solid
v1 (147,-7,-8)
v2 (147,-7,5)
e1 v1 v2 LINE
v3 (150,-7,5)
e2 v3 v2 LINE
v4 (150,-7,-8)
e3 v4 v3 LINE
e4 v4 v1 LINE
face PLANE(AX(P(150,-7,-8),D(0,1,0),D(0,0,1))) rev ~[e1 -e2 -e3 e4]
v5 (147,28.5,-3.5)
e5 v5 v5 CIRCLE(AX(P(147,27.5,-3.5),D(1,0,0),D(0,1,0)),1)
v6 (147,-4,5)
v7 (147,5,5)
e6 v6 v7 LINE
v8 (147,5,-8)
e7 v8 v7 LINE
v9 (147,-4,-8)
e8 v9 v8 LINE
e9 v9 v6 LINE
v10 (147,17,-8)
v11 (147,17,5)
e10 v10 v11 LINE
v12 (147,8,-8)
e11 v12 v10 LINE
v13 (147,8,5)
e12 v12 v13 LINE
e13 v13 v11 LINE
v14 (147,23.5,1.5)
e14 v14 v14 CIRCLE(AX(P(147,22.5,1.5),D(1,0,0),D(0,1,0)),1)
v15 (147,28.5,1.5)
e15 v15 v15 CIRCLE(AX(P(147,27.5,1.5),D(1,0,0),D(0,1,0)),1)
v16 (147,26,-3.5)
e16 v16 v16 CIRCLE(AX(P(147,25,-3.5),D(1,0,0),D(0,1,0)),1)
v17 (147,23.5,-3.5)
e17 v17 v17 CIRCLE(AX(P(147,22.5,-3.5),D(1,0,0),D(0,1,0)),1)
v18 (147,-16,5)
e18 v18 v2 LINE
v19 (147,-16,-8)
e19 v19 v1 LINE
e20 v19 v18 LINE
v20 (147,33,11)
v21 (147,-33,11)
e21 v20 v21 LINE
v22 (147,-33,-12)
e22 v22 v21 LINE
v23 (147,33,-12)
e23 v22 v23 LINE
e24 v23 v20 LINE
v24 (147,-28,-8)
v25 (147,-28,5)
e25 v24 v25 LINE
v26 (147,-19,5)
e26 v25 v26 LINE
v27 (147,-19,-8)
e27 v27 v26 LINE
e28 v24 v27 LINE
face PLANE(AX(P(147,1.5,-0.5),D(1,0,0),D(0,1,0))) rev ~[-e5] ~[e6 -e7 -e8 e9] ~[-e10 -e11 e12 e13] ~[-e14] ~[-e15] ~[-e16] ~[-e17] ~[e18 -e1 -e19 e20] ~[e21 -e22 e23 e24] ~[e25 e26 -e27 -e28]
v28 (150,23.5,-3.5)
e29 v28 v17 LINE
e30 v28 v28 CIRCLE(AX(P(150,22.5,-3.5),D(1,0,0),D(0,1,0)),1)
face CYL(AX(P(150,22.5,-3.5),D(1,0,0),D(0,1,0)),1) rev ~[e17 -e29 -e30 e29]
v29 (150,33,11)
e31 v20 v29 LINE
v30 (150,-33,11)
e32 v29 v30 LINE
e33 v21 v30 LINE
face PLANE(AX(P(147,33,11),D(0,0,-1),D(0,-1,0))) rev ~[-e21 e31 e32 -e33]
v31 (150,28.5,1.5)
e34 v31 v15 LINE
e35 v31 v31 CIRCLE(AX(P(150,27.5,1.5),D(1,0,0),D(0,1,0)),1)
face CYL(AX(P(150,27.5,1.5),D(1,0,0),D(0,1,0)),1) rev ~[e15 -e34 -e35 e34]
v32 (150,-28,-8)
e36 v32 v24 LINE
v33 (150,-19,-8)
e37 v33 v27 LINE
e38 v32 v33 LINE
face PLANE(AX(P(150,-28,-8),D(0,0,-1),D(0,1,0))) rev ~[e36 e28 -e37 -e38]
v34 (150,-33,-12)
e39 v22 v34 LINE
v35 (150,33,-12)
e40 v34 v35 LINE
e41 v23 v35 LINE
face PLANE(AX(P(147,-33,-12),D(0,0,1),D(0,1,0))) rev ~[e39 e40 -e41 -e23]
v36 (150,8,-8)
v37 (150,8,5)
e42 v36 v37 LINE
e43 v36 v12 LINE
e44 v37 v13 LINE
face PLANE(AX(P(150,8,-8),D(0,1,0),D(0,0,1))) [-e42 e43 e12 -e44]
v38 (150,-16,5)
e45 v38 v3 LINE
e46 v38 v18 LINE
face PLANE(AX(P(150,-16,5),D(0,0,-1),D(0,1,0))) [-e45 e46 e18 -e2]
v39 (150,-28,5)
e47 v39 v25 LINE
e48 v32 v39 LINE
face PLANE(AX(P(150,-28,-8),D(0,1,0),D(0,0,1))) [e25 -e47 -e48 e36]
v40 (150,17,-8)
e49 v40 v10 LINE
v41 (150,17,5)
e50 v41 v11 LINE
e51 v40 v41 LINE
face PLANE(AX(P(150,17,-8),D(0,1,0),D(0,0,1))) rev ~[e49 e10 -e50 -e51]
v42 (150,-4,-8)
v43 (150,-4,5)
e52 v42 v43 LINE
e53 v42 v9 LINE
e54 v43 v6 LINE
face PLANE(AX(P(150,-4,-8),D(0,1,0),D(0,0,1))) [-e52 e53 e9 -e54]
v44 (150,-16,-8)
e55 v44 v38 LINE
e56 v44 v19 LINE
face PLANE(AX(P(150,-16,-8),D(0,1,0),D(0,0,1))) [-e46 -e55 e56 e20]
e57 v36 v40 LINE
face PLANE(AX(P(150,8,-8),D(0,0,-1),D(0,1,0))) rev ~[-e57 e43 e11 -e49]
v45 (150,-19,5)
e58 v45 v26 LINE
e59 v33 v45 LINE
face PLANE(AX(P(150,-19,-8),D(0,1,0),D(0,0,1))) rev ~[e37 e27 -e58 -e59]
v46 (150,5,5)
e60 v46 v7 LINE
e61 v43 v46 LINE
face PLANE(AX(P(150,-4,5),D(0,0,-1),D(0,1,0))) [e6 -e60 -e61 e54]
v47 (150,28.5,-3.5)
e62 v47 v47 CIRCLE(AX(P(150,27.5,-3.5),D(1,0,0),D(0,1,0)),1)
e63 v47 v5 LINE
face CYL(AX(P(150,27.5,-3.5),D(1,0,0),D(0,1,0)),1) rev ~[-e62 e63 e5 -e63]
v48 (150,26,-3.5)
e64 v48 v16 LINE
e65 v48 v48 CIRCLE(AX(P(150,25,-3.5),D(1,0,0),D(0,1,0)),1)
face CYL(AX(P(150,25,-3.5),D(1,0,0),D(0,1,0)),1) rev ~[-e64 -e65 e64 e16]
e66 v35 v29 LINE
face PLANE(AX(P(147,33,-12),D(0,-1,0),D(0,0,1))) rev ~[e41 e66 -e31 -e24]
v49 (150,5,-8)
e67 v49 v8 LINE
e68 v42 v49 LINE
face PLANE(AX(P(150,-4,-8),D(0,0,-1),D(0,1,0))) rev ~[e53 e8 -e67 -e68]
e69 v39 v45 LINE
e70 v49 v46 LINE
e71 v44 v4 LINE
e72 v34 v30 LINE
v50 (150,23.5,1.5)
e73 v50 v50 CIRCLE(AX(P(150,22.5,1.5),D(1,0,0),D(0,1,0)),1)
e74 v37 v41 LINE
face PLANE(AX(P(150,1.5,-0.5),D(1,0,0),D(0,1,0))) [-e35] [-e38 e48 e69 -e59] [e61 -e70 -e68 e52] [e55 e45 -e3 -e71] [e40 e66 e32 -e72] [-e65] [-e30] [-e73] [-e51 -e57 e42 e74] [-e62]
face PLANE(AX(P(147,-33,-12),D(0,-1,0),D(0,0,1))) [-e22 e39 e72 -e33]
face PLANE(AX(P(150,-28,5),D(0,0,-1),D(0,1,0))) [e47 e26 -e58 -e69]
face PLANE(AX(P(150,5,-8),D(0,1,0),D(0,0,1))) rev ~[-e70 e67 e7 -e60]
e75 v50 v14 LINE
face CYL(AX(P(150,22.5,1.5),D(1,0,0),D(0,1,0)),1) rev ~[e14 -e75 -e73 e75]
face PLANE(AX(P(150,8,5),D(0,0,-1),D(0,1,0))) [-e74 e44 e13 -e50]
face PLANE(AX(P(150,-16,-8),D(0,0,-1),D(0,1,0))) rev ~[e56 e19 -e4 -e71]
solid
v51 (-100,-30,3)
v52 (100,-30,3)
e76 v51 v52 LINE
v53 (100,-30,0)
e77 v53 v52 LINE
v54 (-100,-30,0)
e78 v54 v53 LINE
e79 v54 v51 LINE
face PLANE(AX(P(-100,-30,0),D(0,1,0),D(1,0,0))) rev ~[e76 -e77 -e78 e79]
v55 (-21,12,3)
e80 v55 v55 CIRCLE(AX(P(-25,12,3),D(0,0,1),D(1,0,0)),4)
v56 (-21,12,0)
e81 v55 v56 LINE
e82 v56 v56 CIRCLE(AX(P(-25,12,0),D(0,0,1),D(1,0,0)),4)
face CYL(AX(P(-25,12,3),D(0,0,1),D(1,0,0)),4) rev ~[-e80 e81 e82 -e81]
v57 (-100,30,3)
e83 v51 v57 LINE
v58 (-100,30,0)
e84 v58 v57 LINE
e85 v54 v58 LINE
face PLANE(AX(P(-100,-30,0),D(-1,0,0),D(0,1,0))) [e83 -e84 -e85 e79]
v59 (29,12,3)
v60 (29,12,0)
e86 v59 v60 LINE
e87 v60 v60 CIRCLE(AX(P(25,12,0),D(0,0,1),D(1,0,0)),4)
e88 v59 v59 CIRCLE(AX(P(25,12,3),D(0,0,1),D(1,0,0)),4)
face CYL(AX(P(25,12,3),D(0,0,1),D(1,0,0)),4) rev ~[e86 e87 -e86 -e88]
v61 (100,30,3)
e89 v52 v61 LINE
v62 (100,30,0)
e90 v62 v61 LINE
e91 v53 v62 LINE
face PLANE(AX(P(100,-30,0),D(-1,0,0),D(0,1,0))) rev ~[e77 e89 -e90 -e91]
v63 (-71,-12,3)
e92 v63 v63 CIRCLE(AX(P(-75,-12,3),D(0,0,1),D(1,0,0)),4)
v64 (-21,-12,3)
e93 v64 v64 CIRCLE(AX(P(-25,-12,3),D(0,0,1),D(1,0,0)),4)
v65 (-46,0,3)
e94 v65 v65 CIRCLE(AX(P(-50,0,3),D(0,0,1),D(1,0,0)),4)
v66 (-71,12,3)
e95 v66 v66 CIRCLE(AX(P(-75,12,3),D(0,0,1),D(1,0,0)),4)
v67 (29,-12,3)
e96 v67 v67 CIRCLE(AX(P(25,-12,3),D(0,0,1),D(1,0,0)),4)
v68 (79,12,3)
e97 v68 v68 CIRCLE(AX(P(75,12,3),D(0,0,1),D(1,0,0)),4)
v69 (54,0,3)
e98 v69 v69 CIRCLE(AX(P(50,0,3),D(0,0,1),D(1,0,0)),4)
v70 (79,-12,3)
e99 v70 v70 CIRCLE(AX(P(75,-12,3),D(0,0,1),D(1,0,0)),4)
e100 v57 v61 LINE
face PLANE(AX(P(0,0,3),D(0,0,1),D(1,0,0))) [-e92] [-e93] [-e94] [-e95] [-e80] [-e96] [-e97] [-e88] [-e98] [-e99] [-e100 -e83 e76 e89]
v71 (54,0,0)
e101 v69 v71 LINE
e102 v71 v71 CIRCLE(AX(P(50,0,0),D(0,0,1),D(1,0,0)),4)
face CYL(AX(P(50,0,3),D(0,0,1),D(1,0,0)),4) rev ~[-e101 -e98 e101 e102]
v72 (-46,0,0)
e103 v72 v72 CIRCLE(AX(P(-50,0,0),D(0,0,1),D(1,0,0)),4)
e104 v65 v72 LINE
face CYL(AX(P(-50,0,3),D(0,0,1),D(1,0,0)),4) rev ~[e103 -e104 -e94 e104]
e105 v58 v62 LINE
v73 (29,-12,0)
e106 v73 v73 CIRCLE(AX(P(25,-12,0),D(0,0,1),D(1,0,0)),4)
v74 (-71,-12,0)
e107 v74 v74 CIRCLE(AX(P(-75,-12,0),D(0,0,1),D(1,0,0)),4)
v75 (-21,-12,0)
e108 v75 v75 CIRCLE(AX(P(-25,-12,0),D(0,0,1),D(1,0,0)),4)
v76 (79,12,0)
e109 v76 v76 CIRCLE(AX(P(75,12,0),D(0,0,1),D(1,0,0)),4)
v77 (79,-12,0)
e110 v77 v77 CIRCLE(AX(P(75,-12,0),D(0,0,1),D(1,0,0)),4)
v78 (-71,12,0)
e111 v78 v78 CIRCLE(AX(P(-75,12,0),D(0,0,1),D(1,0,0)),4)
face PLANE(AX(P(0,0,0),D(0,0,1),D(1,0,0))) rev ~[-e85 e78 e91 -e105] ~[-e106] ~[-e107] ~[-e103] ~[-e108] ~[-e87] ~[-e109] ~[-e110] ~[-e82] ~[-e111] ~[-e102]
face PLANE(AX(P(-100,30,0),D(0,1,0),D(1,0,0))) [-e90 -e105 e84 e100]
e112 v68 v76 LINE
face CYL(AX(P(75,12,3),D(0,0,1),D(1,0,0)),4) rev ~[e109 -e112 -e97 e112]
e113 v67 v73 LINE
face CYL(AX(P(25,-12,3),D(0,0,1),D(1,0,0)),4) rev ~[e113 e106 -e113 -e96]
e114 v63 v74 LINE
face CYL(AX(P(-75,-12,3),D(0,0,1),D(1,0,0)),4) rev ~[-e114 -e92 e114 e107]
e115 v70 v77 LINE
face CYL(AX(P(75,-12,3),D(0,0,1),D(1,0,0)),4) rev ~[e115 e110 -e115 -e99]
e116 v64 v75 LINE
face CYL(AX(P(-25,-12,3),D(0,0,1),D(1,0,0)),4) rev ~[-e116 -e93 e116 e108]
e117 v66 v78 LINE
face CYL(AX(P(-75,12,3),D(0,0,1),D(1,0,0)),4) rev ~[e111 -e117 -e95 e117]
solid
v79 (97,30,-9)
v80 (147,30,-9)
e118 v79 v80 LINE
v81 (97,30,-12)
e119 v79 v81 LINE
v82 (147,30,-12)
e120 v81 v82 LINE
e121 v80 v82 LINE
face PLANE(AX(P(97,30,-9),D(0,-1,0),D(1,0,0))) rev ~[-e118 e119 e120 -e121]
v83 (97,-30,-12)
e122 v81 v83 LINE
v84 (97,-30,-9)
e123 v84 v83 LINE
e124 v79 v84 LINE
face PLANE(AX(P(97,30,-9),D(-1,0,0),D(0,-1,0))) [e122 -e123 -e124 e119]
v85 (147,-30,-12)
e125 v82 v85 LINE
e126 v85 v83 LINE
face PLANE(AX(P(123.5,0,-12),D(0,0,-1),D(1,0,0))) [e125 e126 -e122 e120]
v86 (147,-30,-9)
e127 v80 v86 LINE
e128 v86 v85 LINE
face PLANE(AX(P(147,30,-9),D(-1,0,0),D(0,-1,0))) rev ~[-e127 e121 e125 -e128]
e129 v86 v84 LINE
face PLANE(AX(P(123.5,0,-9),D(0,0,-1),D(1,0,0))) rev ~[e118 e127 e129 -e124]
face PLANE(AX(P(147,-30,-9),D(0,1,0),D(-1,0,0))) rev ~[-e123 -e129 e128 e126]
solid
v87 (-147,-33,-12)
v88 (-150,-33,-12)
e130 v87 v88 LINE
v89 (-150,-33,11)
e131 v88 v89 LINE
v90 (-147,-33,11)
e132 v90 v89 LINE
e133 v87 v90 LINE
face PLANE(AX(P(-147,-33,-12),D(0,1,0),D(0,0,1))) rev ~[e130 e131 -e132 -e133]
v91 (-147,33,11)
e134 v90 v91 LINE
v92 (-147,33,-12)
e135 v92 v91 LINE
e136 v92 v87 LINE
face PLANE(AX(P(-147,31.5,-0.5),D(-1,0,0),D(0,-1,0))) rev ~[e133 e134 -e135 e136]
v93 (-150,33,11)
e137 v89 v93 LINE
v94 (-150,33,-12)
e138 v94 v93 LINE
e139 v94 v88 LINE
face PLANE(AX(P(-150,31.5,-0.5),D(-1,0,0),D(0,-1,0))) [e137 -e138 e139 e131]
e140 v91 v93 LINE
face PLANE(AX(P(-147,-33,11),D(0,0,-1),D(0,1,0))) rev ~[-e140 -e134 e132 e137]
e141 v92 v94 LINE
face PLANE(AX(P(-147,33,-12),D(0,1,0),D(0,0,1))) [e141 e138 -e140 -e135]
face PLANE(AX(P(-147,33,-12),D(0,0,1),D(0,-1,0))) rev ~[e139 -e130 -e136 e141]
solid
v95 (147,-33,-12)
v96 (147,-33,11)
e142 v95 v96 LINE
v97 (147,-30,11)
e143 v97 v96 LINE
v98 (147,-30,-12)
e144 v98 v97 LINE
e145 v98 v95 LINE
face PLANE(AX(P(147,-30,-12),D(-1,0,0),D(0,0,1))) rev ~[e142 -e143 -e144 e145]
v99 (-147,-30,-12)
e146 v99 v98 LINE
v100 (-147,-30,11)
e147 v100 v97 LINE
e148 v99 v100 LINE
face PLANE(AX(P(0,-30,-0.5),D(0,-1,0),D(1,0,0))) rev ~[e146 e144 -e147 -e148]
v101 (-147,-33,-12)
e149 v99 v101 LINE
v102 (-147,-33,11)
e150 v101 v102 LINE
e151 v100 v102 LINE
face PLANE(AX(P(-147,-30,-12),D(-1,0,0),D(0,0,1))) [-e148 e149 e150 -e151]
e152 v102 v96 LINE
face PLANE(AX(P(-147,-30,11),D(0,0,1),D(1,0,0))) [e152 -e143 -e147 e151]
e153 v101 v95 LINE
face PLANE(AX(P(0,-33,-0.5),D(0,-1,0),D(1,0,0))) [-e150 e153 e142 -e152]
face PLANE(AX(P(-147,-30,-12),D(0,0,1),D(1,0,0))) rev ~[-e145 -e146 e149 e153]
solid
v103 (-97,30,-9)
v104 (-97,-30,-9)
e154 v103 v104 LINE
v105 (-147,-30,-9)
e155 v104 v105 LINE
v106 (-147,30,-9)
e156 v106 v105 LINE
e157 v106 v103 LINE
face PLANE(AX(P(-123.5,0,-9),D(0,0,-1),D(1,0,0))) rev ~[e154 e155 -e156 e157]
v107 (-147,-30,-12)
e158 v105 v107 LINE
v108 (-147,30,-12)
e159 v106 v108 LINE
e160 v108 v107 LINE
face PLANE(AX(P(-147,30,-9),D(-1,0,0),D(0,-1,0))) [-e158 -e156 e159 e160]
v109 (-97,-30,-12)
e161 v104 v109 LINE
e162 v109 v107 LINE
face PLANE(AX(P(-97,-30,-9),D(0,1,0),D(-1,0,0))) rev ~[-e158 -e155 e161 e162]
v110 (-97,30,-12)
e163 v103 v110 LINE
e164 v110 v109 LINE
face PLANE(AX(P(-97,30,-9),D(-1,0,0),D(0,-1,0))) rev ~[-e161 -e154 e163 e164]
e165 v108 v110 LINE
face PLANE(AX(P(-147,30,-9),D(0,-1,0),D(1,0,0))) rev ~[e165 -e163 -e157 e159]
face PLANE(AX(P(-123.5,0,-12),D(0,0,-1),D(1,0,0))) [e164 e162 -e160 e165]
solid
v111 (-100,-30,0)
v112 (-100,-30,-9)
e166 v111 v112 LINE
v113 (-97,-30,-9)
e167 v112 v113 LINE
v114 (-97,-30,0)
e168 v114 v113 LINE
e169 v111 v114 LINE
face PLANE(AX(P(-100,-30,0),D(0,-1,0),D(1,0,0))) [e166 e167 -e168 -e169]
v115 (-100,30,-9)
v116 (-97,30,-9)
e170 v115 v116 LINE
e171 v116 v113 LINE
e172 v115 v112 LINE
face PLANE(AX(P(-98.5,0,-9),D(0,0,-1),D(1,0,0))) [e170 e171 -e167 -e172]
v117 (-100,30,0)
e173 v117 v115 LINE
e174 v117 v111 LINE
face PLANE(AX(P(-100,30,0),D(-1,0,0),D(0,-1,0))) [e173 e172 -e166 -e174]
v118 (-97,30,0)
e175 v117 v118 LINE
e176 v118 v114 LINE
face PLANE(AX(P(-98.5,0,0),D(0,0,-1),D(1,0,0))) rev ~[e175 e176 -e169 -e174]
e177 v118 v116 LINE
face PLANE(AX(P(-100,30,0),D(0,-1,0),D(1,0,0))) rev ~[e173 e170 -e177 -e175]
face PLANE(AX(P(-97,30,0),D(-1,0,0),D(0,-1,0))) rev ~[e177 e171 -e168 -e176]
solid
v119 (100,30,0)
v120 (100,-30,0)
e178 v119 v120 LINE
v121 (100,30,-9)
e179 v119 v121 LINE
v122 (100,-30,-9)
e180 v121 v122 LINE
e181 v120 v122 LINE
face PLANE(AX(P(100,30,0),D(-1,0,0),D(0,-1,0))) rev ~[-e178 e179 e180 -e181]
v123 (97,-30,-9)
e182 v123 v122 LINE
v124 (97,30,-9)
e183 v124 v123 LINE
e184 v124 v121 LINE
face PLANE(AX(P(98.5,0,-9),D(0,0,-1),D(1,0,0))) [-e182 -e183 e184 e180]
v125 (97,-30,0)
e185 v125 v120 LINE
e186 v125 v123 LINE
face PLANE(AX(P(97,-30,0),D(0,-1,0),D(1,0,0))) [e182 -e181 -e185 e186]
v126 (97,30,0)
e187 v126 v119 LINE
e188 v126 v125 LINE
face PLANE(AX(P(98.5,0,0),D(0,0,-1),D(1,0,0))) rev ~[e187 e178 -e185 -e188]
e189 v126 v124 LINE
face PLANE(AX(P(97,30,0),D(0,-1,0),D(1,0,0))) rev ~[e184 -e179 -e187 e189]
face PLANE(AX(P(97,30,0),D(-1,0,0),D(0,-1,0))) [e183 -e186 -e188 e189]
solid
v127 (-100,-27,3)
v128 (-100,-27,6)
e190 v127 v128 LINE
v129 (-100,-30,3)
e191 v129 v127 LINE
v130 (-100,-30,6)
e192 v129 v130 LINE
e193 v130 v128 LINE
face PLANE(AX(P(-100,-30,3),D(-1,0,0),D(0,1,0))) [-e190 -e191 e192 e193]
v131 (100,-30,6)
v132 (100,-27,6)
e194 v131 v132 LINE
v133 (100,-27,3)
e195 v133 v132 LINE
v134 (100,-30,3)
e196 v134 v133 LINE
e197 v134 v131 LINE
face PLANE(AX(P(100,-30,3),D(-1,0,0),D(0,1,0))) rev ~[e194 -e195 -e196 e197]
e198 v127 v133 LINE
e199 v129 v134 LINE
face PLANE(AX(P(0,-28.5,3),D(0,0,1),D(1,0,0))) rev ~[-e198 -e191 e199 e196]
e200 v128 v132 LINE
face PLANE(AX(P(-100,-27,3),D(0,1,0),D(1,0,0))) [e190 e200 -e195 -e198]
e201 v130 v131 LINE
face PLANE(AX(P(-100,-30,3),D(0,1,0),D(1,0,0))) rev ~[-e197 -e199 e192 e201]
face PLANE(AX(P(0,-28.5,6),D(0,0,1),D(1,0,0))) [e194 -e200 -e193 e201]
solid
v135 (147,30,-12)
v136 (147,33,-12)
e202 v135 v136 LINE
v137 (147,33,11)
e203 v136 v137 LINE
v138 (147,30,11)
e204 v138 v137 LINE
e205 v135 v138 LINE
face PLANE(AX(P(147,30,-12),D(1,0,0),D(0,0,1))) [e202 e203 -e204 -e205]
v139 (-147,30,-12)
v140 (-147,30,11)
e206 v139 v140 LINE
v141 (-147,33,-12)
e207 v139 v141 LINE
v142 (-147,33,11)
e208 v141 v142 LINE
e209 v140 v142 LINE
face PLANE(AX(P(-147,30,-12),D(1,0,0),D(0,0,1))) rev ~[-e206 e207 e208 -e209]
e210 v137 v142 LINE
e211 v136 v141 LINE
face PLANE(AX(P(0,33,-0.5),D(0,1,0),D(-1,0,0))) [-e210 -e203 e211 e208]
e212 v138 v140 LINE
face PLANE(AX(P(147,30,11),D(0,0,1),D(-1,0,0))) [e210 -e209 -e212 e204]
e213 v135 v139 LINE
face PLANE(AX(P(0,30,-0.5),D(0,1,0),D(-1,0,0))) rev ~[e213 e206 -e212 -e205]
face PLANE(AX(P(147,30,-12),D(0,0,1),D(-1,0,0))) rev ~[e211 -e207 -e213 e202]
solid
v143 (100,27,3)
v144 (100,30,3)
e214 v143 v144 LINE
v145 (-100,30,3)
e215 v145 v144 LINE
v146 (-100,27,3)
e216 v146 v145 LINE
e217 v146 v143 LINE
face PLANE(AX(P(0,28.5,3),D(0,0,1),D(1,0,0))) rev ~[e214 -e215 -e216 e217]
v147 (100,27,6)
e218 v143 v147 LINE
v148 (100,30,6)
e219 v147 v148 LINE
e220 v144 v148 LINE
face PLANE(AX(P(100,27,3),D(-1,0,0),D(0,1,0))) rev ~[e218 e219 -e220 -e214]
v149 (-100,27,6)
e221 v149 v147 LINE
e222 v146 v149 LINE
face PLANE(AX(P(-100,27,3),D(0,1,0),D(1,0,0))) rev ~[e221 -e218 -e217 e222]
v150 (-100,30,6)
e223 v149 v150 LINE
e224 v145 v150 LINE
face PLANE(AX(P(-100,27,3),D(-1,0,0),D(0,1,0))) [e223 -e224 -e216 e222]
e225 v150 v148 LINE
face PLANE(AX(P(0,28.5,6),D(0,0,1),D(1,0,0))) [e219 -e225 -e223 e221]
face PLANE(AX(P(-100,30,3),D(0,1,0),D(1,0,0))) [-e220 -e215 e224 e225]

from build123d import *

# Parameters (mm, degrees)
F0_W      = 200
F0_H      = 60
F1_DEPTH  = 3
F2_W      = 3
F2_H      = 60
F3_DEPTH  = 9
F4_W      = 47
F4_H      = 60
F4_W_2    = 3
F5_DEPTH  = 3
F6_W      = 47
F6_H      = 60
F6_W_2    = 3
F7_DEPTH  = 3
F8_W      = 200
F8_H      = 3
F9_DEPTH  = 3
F10_R     = 4
F11_DEPTH = 3
F12_W     = 294
F12_H     = 23
F12_W_2   = 200
F12_H_2   = 3
F13_DEPTH = 3
F14_W     = 294
F14_H     = 23
F14_W_2   = 200
F14_H_2   = 3
F15_DEPTH = 3
F16_W     = 63
F16_H     = 23
F16_W_2   = 3
F17_DEPTH = 3
F18_W     = 3
F18_H     = 23
F18_W_2   = 63
F19_DEPTH = 3
F20_W     = 9
F20_H     = 13
F20_R     = 1
F21_DEPTH = 25


# Not quite as in the source:
# - a feature names something its author has since deleted; it is built from what else it names


with BuildPart() as f1:
    # F0 (on Top) → F1 (new body)
    with BuildSketch(Plane.XY):
        Rectangle(F0_W, F0_H)
    extrude(amount=F1_DEPTH)

    # F10 (on face) → F11 (cut)
    with BuildSketch(Plane.XY.offset(3)):
        with Locations((-75, 12)):
            Circle(F10_R)
        with Locations((-75, -12)):
            Circle(F10_R)
        with Locations((-25, -12)):
            Circle(F10_R)
        with Locations((-25, 12)):
            Circle(F10_R)
        with Locations((25, 12)):
            Circle(F10_R)
        with Locations((25, -12)):
            Circle(F10_R)
        with Locations((50, 0)):
            Circle(F10_R)
        with Locations((75, 12)):
            Circle(F10_R)
        with Locations((75, -12)):
            Circle(F10_R)
        with Locations((-50, 0)):
            Circle(F10_R)
    extrude(amount=-F11_DEPTH, mode=Mode.SUBTRACT)


with BuildPart() as f3:
    # F2 (on face) → F3 (new body)
    with BuildSketch(Plane(origin=(0, 0, 0), x_dir=(1, 0, 0), z_dir=(0, 0, -1))):
        with Locations((-98.5, 0)):
            Rectangle(F2_W, F2_H)
    extrude(amount=F3_DEPTH)


with BuildPart() as f3b:
    # F2 (on face) → F3, piece 2 (new body)
    with BuildSketch(Plane(origin=(0, 0, 0), x_dir=(1, 0, 0), z_dir=(0, 0, -1))):
        with Locations((98.5, 0)):
            Rectangle(F2_W, F2_H)
    extrude(amount=F3_DEPTH)


with BuildPart() as f5:
    # F4 (on face) → F5 (new body)
    with BuildSketch(Plane(origin=(0, 0, -9), x_dir=(1, 0, 0), z_dir=(0, 0, -1))):
        with Locations((123.5, 0)):
            Rectangle(F4_W, F4_H)
        with Locations((98.5, 0)):
            Rectangle(F4_W_2, F4_H)
    extrude(amount=F5_DEPTH)


with BuildPart() as f7:
    # F6 (on face) → F7 (new body)
    with BuildSketch(Plane(origin=(0, 0, -9), x_dir=(1, 0, 0), z_dir=(0, 0, -1))):
        with Locations((-123.5, 0)):
            Rectangle(F6_W, F6_H)
        with Locations((-98.5, 0)):
            Rectangle(F6_W_2, F6_H)
    extrude(amount=F7_DEPTH)


with BuildPart() as f9:
    # F8 (on face) → F9 (new body)
    with BuildSketch(Plane.XY.offset(3)):
        with Locations((0, 28.5)):
            Rectangle(F8_W, F8_H)
    extrude(amount=F9_DEPTH)


with BuildPart() as f9b:
    # F8 (on face) → F9, piece 2 (new body)
    with BuildSketch(Plane.XY.offset(3)):
        with Locations((0, -28.5)):
            Rectangle(F8_W, F8_H)
    extrude(amount=F9_DEPTH)


with BuildPart() as f13:
    # F12 (on face) → F13 (new body)
    with BuildSketch(Plane.XZ.offset(30)):
        with Locations((0, -0.5)):
            Rectangle(F12_W, F12_H)
        with Locations((0, 1.5)):
            Rectangle(F12_W_2, F12_H_2, mode=Mode.SUBTRACT)
        with Locations((0, 1.5)):
            Rectangle(F12_W_2, F12_H_2)
    extrude(amount=F13_DEPTH)


with BuildPart() as f15:
    # F14 (on face) → F15 (new body)
    with BuildSketch(Plane(origin=(0, 30, 0), x_dir=(-1, 0, 0), z_dir=(0, 1, 0))):
        with Locations((0, -0.5)):
            Rectangle(F14_W, F14_H)
        with Locations((0, 1.5)):
            Rectangle(F14_W_2, F14_H_2, mode=Mode.SUBTRACT)
        with Locations((0, 1.5)):
            Rectangle(F14_W_2, F14_H_2)
    extrude(amount=F15_DEPTH)


with BuildPart() as f17:
    # F16 (on face) → F17 (new body)
    with BuildSketch(Plane.YZ.offset(147)):
        with Locations((1.5, -0.5)):
            Rectangle(F16_W, F16_H)
        with Locations((-31.5, -0.5)):
            Rectangle(F16_W_2, F16_H)
    extrude(amount=F17_DEPTH)

    # F20 (on face) → F21 (cut)
    with BuildSketch(Plane.YZ.offset(150)):
        with Locations((-23.5, -1.5)):
            Rectangle(F20_W, F20_H)
        with Locations((-11.5, -1.5)):
            Rectangle(F20_W, F20_H)
        with Locations((0.5, -1.5)):
            Rectangle(F20_W, F20_H)
        with Locations((12.5, -1.5)):
            Rectangle(F20_W, F20_H)
        with Locations((22.5, 1.5)):
            Circle(F20_R)
        with Locations((27.5, 1.5)):
            Circle(F20_R)
        with Locations((27.5, -3.5)):
            Circle(F20_R)
        with Locations((25, -3.5)):
            Circle(F20_R)
        with Locations((22.5, -3.5)):
            Circle(F20_R)
    extrude(amount=-F21_DEPTH, mode=Mode.SUBTRACT)


with BuildPart() as f19:
    # F18 (on face) → F19 (new body)
    with BuildSketch(Plane(origin=(-147, 0, 0), x_dir=(0, -1, 0), z_dir=(-1, 0, 0))):
        with Locations((-31.5, -0.5)):
            Rectangle(F18_W, F18_H)
        with Locations((1.5, -0.5)):
            Rectangle(F18_W_2, F18_H)
    extrude(amount=F19_DEPTH)


solid = Compound([f1.part, f3.part, f3b.part, f5.part, f7.part, f9.part, f9b.part, f13.part, f15.part, f17.part, f19.part])
